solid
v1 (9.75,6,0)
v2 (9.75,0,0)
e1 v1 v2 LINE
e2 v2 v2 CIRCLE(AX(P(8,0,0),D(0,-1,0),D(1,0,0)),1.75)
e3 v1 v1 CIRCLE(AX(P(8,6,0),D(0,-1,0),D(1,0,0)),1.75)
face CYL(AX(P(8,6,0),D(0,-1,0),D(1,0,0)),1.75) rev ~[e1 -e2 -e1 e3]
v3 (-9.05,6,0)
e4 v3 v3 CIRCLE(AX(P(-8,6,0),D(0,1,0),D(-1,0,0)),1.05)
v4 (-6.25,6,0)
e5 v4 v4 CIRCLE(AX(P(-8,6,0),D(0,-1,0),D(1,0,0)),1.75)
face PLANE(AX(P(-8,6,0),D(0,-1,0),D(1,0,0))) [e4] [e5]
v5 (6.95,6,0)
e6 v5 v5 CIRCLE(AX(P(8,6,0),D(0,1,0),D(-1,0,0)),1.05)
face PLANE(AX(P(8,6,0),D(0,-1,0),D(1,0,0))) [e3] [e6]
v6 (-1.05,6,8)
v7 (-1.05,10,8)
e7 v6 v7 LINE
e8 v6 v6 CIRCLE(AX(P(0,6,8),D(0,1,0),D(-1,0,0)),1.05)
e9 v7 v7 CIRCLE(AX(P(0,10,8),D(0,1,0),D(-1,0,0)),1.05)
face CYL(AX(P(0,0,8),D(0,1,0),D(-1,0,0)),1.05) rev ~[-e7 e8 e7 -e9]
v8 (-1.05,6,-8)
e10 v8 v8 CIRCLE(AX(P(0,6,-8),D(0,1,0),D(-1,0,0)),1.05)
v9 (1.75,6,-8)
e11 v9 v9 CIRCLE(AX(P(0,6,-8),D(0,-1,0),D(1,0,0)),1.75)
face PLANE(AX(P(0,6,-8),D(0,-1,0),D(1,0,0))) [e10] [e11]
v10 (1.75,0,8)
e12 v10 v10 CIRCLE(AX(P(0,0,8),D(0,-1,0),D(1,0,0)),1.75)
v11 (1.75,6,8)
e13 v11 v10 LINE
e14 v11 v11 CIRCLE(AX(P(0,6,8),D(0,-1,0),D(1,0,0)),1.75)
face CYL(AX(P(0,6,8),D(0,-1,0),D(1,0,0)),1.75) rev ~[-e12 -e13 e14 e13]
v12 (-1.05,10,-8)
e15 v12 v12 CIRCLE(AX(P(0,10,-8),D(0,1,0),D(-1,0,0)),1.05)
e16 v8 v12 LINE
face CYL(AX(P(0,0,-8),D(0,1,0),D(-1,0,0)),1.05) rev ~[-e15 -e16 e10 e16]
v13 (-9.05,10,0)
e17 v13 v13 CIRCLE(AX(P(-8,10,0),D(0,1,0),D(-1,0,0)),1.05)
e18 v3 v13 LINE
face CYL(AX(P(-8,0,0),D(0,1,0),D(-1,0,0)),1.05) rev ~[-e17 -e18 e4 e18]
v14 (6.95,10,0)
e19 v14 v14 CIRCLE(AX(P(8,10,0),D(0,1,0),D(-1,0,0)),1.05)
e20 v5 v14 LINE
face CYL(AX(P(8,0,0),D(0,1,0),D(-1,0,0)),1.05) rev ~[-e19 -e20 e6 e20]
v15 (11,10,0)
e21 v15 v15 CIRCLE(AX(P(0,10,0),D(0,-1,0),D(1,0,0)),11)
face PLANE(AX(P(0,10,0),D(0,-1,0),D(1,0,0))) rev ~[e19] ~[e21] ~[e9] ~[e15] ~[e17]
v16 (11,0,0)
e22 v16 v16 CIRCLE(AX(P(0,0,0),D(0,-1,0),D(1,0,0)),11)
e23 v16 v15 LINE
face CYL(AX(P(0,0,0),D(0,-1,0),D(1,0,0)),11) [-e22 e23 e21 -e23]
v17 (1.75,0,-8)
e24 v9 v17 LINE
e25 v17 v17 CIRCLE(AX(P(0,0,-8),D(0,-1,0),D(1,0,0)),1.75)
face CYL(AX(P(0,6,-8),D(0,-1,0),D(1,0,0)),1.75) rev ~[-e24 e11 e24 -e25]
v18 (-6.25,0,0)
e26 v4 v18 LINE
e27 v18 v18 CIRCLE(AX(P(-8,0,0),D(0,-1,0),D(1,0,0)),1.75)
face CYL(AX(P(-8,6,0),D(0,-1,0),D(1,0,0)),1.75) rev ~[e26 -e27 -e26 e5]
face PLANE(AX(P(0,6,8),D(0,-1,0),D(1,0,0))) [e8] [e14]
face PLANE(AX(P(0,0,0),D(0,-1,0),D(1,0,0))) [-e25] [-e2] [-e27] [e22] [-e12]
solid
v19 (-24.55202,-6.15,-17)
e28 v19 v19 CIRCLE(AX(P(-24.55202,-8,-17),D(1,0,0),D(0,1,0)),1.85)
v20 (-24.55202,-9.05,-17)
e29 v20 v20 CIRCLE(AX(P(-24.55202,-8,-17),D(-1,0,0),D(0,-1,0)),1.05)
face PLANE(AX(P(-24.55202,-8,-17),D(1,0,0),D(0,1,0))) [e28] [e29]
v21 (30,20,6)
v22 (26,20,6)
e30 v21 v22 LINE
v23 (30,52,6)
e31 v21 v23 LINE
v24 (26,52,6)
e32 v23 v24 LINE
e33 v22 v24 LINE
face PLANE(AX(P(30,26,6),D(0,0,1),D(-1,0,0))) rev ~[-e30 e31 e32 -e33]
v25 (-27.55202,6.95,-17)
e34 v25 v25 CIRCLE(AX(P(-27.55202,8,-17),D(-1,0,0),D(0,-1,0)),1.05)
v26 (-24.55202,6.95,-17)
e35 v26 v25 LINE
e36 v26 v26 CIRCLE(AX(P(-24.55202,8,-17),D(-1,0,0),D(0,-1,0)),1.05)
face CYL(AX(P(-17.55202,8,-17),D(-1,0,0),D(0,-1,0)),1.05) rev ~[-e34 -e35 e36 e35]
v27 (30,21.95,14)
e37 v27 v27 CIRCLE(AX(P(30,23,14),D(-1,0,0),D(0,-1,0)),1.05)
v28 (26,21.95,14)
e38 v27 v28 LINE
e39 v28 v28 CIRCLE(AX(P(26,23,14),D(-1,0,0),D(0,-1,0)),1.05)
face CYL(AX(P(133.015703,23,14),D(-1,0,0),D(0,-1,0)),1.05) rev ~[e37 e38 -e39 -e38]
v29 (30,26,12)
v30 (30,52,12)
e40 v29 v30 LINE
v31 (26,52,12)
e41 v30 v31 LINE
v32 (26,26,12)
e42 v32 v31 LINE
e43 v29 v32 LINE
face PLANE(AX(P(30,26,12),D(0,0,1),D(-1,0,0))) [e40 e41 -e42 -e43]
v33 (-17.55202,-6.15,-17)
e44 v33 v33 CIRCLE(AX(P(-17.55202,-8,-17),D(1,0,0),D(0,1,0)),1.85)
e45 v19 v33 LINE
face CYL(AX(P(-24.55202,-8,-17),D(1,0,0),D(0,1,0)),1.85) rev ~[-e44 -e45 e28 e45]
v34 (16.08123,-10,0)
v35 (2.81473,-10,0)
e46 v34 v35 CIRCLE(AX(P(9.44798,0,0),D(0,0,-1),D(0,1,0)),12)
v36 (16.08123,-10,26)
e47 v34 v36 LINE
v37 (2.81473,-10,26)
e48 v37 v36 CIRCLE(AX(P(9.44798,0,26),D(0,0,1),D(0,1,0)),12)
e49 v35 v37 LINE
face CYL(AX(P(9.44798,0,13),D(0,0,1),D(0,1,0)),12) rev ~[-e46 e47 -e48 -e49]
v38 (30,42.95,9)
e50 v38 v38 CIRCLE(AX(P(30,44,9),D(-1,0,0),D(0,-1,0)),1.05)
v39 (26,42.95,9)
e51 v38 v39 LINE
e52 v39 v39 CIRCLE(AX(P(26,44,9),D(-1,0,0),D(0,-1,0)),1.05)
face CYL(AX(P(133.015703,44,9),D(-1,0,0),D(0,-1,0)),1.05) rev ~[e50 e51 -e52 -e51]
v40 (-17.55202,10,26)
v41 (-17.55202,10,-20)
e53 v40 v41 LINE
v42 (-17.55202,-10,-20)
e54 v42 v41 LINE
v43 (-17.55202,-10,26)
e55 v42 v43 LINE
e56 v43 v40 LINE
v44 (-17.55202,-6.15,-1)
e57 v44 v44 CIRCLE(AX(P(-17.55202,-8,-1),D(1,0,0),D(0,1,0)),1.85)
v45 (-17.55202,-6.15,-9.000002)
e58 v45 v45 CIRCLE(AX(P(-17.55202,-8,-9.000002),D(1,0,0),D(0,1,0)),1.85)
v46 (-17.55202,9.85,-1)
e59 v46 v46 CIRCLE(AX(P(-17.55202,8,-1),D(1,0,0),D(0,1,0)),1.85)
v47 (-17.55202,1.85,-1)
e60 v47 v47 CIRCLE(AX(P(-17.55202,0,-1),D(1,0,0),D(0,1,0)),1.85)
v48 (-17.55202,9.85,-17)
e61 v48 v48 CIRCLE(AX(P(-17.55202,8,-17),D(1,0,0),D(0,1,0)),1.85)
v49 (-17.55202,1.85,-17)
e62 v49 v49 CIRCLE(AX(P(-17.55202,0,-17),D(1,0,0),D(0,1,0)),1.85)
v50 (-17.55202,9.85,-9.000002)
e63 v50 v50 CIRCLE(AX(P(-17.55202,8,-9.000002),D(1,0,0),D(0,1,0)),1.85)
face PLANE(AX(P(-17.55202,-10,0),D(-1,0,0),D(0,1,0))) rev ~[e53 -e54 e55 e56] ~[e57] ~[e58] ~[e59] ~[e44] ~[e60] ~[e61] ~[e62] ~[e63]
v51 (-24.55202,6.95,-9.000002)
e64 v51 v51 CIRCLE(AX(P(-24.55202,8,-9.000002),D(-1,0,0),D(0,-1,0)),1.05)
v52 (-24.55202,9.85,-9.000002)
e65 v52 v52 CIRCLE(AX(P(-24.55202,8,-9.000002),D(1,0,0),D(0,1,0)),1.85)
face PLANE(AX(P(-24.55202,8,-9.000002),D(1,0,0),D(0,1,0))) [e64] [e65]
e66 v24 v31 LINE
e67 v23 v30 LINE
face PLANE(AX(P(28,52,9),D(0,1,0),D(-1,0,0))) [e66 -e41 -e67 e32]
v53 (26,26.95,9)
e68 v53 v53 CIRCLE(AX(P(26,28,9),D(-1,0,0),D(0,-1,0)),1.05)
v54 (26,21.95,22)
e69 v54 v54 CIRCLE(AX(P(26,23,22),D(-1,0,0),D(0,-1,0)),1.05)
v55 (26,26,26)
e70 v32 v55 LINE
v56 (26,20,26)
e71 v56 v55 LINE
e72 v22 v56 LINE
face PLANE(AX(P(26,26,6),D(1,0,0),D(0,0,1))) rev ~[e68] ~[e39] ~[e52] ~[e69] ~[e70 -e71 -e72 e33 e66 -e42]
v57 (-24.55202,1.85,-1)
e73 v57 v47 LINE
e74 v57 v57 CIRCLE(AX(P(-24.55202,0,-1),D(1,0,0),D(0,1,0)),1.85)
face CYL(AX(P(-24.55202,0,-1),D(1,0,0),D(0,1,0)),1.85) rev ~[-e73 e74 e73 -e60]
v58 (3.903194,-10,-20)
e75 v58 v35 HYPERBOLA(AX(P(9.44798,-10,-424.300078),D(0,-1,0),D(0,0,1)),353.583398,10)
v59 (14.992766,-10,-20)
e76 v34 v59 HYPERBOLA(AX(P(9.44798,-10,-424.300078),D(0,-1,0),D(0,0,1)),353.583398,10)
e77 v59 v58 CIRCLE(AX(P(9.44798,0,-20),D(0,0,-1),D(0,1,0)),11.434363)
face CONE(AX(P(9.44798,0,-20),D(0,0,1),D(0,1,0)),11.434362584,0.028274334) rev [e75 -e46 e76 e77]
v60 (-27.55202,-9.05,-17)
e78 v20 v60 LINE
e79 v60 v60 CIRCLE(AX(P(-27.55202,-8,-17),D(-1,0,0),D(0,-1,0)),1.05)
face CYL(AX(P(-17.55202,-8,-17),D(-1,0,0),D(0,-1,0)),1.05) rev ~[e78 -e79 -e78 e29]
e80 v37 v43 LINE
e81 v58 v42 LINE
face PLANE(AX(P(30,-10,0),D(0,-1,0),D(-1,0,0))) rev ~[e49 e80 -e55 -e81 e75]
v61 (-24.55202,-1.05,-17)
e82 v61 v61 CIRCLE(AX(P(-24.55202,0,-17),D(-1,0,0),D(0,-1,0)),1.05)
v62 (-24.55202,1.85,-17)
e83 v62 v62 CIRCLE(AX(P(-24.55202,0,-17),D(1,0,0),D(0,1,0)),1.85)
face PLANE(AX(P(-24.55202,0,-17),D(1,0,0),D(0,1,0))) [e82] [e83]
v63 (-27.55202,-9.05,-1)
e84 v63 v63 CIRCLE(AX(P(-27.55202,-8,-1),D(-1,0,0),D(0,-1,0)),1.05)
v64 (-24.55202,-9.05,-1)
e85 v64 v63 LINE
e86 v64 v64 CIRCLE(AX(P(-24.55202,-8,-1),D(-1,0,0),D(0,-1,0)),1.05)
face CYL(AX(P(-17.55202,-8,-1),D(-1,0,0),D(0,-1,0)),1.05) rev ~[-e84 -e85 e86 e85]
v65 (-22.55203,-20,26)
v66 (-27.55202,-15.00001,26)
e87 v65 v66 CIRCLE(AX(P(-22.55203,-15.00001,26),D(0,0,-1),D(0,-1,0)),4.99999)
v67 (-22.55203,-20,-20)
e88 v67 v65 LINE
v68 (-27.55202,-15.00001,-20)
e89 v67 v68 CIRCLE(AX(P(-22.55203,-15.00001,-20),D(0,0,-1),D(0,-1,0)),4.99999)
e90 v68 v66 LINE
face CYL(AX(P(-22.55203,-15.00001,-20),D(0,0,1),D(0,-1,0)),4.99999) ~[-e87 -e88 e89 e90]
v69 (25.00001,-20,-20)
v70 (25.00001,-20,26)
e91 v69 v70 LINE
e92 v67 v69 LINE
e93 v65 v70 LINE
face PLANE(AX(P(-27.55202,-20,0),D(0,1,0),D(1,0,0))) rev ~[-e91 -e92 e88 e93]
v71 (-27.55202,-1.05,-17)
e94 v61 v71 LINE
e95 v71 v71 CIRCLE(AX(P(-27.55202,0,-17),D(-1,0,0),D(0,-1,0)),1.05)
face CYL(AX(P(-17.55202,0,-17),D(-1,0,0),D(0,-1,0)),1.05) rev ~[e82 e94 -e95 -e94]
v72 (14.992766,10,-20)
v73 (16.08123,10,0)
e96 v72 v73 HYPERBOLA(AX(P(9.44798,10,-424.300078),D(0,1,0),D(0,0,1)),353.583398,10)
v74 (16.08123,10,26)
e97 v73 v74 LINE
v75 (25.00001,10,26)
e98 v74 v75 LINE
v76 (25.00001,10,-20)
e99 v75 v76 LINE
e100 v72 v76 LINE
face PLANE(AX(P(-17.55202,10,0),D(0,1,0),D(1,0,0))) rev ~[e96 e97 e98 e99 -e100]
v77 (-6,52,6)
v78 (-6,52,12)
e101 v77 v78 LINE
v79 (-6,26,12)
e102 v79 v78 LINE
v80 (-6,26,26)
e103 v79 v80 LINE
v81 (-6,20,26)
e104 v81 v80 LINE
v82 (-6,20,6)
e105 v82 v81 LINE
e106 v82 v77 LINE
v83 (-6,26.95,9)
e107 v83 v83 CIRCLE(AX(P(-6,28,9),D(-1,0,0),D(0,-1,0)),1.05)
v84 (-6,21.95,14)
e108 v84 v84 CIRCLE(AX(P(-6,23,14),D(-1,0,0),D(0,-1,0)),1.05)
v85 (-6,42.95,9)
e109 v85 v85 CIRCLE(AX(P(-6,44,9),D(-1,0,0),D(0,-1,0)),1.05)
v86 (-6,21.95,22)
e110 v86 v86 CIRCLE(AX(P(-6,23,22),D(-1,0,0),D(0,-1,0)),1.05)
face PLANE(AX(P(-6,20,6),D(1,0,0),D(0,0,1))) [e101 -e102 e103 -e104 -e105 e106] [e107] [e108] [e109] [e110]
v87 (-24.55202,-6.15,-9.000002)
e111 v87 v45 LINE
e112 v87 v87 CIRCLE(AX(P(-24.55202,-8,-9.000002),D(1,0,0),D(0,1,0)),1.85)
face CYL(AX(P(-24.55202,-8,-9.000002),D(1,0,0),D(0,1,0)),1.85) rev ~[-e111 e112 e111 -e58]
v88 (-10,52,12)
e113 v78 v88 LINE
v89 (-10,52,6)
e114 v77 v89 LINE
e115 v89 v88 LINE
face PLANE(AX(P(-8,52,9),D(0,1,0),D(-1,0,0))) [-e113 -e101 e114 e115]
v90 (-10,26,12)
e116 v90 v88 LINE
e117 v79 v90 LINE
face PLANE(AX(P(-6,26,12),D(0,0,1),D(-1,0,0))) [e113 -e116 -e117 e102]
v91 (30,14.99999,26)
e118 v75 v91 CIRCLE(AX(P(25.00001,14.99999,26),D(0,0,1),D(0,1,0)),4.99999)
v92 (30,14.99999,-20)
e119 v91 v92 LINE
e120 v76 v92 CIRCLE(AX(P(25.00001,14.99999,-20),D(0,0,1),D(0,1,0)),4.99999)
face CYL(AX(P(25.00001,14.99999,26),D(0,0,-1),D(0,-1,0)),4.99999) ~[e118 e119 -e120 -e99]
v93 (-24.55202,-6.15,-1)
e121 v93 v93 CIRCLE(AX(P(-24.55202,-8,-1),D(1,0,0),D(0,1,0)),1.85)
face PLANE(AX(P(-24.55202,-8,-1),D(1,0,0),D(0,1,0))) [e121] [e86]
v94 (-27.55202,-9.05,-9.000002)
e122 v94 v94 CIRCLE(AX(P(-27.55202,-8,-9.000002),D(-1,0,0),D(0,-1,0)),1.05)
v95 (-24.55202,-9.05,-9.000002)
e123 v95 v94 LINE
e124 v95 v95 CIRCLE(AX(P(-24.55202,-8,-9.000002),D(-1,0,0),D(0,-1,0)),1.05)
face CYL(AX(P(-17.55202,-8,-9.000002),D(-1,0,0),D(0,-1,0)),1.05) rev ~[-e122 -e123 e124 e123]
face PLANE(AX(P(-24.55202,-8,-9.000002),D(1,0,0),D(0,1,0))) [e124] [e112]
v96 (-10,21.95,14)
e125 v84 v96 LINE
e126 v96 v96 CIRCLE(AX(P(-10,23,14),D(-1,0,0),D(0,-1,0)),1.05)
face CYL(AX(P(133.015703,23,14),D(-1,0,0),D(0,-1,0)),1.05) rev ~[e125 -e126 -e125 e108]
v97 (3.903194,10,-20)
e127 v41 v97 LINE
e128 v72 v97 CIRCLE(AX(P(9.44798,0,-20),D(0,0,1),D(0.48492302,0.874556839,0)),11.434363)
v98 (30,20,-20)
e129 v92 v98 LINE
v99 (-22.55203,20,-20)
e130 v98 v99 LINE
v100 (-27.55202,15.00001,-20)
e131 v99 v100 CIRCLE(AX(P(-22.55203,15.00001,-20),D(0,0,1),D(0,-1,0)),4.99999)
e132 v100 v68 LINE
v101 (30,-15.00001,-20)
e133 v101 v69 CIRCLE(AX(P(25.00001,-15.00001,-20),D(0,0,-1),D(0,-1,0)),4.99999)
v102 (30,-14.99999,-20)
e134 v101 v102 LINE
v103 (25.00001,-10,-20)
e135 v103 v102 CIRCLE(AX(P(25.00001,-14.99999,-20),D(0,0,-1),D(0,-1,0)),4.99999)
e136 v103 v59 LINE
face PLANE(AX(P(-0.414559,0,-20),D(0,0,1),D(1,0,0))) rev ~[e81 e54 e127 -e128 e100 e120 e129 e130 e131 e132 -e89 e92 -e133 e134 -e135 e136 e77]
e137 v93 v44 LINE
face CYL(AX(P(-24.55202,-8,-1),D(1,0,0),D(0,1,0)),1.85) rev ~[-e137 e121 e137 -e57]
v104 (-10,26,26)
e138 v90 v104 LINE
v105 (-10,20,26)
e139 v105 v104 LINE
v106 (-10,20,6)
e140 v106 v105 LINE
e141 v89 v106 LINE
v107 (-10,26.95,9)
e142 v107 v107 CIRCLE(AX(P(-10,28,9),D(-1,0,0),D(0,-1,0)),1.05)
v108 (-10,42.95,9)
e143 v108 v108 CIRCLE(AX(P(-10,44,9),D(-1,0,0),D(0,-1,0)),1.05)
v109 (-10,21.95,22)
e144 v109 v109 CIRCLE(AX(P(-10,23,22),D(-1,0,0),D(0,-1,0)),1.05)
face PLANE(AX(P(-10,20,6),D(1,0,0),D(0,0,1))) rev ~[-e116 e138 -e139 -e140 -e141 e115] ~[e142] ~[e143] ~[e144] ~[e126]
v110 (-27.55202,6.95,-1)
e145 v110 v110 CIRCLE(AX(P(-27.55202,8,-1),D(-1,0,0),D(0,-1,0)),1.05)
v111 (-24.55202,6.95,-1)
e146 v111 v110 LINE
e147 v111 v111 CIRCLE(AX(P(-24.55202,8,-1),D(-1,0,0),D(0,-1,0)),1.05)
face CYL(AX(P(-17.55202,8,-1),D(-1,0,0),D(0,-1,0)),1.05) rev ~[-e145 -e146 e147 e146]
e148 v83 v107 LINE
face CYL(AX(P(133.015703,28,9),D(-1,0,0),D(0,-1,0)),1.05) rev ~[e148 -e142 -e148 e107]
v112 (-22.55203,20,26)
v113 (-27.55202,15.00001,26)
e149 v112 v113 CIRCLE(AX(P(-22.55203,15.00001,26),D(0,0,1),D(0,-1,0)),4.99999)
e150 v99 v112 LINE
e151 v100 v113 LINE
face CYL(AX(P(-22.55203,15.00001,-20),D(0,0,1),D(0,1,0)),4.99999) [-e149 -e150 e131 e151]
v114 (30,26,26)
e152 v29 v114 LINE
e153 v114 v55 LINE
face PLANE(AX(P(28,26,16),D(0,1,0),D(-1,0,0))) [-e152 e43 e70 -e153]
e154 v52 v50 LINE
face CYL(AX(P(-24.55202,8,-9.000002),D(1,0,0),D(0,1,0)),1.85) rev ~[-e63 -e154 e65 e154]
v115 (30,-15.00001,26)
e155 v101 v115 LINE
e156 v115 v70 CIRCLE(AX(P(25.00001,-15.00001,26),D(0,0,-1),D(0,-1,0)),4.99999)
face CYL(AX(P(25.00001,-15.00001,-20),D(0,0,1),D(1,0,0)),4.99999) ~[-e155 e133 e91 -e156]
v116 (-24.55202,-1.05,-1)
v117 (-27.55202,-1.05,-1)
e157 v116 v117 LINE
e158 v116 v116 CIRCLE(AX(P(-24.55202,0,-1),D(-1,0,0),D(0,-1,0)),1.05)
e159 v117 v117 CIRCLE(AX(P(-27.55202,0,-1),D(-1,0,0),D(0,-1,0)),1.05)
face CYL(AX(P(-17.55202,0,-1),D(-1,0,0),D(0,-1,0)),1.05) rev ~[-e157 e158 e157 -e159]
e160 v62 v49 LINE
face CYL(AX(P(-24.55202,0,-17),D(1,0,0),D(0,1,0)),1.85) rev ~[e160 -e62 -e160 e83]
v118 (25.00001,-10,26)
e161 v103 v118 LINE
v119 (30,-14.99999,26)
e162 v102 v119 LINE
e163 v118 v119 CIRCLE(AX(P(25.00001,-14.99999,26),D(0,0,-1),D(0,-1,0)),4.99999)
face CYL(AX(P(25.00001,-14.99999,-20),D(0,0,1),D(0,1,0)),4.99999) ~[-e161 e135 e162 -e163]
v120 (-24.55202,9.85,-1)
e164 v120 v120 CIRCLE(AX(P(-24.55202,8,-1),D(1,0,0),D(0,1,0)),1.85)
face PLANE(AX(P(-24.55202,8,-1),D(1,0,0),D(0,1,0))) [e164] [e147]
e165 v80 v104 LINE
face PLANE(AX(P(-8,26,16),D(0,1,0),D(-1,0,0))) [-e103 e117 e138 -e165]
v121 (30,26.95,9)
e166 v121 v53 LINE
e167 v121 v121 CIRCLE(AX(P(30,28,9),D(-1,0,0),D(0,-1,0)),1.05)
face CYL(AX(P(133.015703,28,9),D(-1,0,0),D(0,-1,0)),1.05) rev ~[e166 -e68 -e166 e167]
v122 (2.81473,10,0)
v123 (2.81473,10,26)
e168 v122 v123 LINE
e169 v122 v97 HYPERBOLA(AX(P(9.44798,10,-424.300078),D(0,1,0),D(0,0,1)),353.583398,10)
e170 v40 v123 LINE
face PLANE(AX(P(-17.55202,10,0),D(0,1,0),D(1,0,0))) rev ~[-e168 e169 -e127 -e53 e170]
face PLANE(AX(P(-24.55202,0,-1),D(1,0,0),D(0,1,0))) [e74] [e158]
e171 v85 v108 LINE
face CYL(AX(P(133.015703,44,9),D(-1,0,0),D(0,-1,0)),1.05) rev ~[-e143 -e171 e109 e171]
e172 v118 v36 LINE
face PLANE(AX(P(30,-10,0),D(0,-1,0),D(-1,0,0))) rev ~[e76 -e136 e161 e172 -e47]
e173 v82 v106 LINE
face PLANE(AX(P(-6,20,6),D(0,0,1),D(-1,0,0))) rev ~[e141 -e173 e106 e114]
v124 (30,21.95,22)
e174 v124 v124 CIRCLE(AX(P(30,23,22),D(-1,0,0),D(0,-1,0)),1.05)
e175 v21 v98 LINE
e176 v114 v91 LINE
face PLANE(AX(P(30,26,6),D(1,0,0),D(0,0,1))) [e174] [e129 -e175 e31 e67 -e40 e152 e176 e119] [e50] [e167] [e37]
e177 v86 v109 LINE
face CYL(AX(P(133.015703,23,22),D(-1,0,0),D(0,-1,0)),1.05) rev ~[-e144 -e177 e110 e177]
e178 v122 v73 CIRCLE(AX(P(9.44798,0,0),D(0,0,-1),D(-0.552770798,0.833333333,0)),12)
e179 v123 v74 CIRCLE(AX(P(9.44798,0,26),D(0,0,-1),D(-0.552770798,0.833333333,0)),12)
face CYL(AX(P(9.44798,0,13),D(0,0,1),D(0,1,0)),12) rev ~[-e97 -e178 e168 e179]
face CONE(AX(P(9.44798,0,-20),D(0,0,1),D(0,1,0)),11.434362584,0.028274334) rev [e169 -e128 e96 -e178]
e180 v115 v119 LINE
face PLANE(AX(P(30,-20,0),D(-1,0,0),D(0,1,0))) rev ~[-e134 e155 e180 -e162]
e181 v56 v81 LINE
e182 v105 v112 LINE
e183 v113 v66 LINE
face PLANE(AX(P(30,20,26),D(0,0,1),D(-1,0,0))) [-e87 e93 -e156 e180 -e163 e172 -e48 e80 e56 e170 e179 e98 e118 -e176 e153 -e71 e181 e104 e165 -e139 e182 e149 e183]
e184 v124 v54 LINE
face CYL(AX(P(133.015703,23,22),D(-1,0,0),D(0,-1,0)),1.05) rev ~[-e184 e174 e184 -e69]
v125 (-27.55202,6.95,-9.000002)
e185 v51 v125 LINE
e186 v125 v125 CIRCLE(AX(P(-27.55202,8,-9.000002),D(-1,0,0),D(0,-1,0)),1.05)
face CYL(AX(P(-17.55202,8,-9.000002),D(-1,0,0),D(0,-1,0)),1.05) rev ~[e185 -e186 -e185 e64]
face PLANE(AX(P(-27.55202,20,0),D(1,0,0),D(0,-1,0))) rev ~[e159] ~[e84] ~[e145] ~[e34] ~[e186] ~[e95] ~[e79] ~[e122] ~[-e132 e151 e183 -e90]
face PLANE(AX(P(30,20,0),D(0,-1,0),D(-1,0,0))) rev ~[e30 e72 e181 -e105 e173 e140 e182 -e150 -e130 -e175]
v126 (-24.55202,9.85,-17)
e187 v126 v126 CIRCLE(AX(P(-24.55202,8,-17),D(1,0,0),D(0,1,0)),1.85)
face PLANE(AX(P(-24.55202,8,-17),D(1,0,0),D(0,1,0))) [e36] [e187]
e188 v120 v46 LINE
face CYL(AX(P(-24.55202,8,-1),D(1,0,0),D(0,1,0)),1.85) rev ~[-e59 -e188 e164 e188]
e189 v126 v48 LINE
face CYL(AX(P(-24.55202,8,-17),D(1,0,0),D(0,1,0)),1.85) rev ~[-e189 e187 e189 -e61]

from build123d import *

# Parameters (mm, degrees)
F1_DEPTH        = 20
F2_DEPTH        = 26
F4_W            = 12
F4_H            = 26
F8_R            = 4.99999
F7_W            = 4
F7_H            = 20
F9_DEPTH        = 6
F10_W           = 4
F10_H           = 6
F11_DEPTH       = 26
F13_D           = 2.1
F14_R           = 11
F15_DEPTH       = 10
F16_D           = 2.1
F16_CBORE_D     = 3.5
F16_CBORE_DEPTH = 6
F18_D           = 2.1
F18_CBORE_D     = 3.7
F18_CBORE_DEPTH = 7


# Not quite as in the source:
# - a fillet or chamfer is up to 0.001 mm smaller than in the source, because OpenCascade refuses the exact size
# - a feature names something its author has since deleted; it is built from what else it names


with BuildPart() as f1:
    # F0 (on Top) → F1 (new body)
    with BuildSketch(Plane.XY):
        Polygon((30, 20), (-27.5520200282, 20), (-27.5520200282, -20), (30, -20), (30, -10), (-17.5520200282, -10), (-17.5520200282, 10), (30, 10), align=None)
    extrude(amount=-F1_DEPTH)

    # F0 (on Top) → F2 (join)
    with BuildSketch(Plane.XY):
        Polygon((30, 20), (-27.5520200282, 20), (-27.5520200282, -20), (30, -20), (30, -10), (-17.5520200282, -10), (-17.5520200282, 10), (30, 10), align=None)
    extrude(amount=F2_DEPTH)

    # F4 (on plane+point) → F5 (revolve, cut)
    with BuildSketch(Plane.YZ.offset(9.4479799718)):
        Polygon((12, 0), (0, 0), (0, -20), (11.4343625836, -20), align=None)
    revolve(axis=Axis((9.4479799718, 0, -10), (0, 0, -1)), mode=Mode.SUBTRACT)

    # F4 (on plane+point) → F6 (revolve, cut)
    with BuildSketch(Plane.YZ.offset(9.4479799718)):
        with Locations((6, 13)):
            Rectangle(F4_W, F4_H)
    revolve(axis=Axis((9.4479799718, 0, 13), (0, 0, 1)), mode=Mode.SUBTRACT)

    # F8 (radius 5 in the source; OpenCascade refuses exactly that, so slightly less here)
    f8_edges = [f1.edges().sort_by_distance(p)[0] for p in [
        (30, -10, 3),
        (30, 10, 3),
        (30, -20, 3),
        (-27.55202, -20, 3),
        (-27.55202, 20, 3),
    ]]
    fillet(f8_edges, radius=F8_R)

    # F7 (on face) → F9 (join)
    with BuildSketch(Plane(origin=(0, 20, 0), x_dir=(-1, 0, 0), z_dir=(0, 1, 0))):
        with Locations((-28, 16)):
            Rectangle(F7_W, F7_H)
        with Locations((8, 16)):
            Rectangle(F7_W, F7_H)
    extrude(amount=F9_DEPTH)

    # F10 (on face) → F11 (join)
    with BuildSketch(Plane(origin=(0, 26, 0), x_dir=(-1, 0, 0), z_dir=(0, 1, 0))):
        with Locations((-28, 9)):
            Rectangle(F10_W, F10_H)
        with Locations((8, 9)):
            Rectangle(F10_W, F10_H)
    extrude(amount=F11_DEPTH)

    # F13 (through all)
    with Locations(Plane.YZ.offset(30)):
        with Locations((23, 22), (23, 14), (28, 9), (44, 9)):
            Hole(F13_D / 2)

    # F18 (through all)
    with Locations(Plane.YZ.offset(-17.5520200282)):
        with Locations((-8, -1), (0, -1), (8, -1), (8, -9.0000019357), (8, -17), (0, -17), (-8, -17), (-8, -9.0000019357)):
            CounterBoreHole(F18_D / 2, F18_CBORE_D / 2, F18_CBORE_DEPTH)


with BuildPart() as f15:
    # F14 (on Front) → F15 (new body)
    with BuildSketch(Plane.XZ):
        Circle(F14_R)
    extrude(amount=-F15_DEPTH)

    # F16 (through all)
    with Locations(Plane.XZ):
        with Locations((0, 8), (8, 0), (0, -8), (-8, 0)):
            CounterBoreHole(F16_D / 2, F16_CBORE_D / 2, F16_CBORE_DEPTH)


solid = Compound([f1.part, f15.part])
